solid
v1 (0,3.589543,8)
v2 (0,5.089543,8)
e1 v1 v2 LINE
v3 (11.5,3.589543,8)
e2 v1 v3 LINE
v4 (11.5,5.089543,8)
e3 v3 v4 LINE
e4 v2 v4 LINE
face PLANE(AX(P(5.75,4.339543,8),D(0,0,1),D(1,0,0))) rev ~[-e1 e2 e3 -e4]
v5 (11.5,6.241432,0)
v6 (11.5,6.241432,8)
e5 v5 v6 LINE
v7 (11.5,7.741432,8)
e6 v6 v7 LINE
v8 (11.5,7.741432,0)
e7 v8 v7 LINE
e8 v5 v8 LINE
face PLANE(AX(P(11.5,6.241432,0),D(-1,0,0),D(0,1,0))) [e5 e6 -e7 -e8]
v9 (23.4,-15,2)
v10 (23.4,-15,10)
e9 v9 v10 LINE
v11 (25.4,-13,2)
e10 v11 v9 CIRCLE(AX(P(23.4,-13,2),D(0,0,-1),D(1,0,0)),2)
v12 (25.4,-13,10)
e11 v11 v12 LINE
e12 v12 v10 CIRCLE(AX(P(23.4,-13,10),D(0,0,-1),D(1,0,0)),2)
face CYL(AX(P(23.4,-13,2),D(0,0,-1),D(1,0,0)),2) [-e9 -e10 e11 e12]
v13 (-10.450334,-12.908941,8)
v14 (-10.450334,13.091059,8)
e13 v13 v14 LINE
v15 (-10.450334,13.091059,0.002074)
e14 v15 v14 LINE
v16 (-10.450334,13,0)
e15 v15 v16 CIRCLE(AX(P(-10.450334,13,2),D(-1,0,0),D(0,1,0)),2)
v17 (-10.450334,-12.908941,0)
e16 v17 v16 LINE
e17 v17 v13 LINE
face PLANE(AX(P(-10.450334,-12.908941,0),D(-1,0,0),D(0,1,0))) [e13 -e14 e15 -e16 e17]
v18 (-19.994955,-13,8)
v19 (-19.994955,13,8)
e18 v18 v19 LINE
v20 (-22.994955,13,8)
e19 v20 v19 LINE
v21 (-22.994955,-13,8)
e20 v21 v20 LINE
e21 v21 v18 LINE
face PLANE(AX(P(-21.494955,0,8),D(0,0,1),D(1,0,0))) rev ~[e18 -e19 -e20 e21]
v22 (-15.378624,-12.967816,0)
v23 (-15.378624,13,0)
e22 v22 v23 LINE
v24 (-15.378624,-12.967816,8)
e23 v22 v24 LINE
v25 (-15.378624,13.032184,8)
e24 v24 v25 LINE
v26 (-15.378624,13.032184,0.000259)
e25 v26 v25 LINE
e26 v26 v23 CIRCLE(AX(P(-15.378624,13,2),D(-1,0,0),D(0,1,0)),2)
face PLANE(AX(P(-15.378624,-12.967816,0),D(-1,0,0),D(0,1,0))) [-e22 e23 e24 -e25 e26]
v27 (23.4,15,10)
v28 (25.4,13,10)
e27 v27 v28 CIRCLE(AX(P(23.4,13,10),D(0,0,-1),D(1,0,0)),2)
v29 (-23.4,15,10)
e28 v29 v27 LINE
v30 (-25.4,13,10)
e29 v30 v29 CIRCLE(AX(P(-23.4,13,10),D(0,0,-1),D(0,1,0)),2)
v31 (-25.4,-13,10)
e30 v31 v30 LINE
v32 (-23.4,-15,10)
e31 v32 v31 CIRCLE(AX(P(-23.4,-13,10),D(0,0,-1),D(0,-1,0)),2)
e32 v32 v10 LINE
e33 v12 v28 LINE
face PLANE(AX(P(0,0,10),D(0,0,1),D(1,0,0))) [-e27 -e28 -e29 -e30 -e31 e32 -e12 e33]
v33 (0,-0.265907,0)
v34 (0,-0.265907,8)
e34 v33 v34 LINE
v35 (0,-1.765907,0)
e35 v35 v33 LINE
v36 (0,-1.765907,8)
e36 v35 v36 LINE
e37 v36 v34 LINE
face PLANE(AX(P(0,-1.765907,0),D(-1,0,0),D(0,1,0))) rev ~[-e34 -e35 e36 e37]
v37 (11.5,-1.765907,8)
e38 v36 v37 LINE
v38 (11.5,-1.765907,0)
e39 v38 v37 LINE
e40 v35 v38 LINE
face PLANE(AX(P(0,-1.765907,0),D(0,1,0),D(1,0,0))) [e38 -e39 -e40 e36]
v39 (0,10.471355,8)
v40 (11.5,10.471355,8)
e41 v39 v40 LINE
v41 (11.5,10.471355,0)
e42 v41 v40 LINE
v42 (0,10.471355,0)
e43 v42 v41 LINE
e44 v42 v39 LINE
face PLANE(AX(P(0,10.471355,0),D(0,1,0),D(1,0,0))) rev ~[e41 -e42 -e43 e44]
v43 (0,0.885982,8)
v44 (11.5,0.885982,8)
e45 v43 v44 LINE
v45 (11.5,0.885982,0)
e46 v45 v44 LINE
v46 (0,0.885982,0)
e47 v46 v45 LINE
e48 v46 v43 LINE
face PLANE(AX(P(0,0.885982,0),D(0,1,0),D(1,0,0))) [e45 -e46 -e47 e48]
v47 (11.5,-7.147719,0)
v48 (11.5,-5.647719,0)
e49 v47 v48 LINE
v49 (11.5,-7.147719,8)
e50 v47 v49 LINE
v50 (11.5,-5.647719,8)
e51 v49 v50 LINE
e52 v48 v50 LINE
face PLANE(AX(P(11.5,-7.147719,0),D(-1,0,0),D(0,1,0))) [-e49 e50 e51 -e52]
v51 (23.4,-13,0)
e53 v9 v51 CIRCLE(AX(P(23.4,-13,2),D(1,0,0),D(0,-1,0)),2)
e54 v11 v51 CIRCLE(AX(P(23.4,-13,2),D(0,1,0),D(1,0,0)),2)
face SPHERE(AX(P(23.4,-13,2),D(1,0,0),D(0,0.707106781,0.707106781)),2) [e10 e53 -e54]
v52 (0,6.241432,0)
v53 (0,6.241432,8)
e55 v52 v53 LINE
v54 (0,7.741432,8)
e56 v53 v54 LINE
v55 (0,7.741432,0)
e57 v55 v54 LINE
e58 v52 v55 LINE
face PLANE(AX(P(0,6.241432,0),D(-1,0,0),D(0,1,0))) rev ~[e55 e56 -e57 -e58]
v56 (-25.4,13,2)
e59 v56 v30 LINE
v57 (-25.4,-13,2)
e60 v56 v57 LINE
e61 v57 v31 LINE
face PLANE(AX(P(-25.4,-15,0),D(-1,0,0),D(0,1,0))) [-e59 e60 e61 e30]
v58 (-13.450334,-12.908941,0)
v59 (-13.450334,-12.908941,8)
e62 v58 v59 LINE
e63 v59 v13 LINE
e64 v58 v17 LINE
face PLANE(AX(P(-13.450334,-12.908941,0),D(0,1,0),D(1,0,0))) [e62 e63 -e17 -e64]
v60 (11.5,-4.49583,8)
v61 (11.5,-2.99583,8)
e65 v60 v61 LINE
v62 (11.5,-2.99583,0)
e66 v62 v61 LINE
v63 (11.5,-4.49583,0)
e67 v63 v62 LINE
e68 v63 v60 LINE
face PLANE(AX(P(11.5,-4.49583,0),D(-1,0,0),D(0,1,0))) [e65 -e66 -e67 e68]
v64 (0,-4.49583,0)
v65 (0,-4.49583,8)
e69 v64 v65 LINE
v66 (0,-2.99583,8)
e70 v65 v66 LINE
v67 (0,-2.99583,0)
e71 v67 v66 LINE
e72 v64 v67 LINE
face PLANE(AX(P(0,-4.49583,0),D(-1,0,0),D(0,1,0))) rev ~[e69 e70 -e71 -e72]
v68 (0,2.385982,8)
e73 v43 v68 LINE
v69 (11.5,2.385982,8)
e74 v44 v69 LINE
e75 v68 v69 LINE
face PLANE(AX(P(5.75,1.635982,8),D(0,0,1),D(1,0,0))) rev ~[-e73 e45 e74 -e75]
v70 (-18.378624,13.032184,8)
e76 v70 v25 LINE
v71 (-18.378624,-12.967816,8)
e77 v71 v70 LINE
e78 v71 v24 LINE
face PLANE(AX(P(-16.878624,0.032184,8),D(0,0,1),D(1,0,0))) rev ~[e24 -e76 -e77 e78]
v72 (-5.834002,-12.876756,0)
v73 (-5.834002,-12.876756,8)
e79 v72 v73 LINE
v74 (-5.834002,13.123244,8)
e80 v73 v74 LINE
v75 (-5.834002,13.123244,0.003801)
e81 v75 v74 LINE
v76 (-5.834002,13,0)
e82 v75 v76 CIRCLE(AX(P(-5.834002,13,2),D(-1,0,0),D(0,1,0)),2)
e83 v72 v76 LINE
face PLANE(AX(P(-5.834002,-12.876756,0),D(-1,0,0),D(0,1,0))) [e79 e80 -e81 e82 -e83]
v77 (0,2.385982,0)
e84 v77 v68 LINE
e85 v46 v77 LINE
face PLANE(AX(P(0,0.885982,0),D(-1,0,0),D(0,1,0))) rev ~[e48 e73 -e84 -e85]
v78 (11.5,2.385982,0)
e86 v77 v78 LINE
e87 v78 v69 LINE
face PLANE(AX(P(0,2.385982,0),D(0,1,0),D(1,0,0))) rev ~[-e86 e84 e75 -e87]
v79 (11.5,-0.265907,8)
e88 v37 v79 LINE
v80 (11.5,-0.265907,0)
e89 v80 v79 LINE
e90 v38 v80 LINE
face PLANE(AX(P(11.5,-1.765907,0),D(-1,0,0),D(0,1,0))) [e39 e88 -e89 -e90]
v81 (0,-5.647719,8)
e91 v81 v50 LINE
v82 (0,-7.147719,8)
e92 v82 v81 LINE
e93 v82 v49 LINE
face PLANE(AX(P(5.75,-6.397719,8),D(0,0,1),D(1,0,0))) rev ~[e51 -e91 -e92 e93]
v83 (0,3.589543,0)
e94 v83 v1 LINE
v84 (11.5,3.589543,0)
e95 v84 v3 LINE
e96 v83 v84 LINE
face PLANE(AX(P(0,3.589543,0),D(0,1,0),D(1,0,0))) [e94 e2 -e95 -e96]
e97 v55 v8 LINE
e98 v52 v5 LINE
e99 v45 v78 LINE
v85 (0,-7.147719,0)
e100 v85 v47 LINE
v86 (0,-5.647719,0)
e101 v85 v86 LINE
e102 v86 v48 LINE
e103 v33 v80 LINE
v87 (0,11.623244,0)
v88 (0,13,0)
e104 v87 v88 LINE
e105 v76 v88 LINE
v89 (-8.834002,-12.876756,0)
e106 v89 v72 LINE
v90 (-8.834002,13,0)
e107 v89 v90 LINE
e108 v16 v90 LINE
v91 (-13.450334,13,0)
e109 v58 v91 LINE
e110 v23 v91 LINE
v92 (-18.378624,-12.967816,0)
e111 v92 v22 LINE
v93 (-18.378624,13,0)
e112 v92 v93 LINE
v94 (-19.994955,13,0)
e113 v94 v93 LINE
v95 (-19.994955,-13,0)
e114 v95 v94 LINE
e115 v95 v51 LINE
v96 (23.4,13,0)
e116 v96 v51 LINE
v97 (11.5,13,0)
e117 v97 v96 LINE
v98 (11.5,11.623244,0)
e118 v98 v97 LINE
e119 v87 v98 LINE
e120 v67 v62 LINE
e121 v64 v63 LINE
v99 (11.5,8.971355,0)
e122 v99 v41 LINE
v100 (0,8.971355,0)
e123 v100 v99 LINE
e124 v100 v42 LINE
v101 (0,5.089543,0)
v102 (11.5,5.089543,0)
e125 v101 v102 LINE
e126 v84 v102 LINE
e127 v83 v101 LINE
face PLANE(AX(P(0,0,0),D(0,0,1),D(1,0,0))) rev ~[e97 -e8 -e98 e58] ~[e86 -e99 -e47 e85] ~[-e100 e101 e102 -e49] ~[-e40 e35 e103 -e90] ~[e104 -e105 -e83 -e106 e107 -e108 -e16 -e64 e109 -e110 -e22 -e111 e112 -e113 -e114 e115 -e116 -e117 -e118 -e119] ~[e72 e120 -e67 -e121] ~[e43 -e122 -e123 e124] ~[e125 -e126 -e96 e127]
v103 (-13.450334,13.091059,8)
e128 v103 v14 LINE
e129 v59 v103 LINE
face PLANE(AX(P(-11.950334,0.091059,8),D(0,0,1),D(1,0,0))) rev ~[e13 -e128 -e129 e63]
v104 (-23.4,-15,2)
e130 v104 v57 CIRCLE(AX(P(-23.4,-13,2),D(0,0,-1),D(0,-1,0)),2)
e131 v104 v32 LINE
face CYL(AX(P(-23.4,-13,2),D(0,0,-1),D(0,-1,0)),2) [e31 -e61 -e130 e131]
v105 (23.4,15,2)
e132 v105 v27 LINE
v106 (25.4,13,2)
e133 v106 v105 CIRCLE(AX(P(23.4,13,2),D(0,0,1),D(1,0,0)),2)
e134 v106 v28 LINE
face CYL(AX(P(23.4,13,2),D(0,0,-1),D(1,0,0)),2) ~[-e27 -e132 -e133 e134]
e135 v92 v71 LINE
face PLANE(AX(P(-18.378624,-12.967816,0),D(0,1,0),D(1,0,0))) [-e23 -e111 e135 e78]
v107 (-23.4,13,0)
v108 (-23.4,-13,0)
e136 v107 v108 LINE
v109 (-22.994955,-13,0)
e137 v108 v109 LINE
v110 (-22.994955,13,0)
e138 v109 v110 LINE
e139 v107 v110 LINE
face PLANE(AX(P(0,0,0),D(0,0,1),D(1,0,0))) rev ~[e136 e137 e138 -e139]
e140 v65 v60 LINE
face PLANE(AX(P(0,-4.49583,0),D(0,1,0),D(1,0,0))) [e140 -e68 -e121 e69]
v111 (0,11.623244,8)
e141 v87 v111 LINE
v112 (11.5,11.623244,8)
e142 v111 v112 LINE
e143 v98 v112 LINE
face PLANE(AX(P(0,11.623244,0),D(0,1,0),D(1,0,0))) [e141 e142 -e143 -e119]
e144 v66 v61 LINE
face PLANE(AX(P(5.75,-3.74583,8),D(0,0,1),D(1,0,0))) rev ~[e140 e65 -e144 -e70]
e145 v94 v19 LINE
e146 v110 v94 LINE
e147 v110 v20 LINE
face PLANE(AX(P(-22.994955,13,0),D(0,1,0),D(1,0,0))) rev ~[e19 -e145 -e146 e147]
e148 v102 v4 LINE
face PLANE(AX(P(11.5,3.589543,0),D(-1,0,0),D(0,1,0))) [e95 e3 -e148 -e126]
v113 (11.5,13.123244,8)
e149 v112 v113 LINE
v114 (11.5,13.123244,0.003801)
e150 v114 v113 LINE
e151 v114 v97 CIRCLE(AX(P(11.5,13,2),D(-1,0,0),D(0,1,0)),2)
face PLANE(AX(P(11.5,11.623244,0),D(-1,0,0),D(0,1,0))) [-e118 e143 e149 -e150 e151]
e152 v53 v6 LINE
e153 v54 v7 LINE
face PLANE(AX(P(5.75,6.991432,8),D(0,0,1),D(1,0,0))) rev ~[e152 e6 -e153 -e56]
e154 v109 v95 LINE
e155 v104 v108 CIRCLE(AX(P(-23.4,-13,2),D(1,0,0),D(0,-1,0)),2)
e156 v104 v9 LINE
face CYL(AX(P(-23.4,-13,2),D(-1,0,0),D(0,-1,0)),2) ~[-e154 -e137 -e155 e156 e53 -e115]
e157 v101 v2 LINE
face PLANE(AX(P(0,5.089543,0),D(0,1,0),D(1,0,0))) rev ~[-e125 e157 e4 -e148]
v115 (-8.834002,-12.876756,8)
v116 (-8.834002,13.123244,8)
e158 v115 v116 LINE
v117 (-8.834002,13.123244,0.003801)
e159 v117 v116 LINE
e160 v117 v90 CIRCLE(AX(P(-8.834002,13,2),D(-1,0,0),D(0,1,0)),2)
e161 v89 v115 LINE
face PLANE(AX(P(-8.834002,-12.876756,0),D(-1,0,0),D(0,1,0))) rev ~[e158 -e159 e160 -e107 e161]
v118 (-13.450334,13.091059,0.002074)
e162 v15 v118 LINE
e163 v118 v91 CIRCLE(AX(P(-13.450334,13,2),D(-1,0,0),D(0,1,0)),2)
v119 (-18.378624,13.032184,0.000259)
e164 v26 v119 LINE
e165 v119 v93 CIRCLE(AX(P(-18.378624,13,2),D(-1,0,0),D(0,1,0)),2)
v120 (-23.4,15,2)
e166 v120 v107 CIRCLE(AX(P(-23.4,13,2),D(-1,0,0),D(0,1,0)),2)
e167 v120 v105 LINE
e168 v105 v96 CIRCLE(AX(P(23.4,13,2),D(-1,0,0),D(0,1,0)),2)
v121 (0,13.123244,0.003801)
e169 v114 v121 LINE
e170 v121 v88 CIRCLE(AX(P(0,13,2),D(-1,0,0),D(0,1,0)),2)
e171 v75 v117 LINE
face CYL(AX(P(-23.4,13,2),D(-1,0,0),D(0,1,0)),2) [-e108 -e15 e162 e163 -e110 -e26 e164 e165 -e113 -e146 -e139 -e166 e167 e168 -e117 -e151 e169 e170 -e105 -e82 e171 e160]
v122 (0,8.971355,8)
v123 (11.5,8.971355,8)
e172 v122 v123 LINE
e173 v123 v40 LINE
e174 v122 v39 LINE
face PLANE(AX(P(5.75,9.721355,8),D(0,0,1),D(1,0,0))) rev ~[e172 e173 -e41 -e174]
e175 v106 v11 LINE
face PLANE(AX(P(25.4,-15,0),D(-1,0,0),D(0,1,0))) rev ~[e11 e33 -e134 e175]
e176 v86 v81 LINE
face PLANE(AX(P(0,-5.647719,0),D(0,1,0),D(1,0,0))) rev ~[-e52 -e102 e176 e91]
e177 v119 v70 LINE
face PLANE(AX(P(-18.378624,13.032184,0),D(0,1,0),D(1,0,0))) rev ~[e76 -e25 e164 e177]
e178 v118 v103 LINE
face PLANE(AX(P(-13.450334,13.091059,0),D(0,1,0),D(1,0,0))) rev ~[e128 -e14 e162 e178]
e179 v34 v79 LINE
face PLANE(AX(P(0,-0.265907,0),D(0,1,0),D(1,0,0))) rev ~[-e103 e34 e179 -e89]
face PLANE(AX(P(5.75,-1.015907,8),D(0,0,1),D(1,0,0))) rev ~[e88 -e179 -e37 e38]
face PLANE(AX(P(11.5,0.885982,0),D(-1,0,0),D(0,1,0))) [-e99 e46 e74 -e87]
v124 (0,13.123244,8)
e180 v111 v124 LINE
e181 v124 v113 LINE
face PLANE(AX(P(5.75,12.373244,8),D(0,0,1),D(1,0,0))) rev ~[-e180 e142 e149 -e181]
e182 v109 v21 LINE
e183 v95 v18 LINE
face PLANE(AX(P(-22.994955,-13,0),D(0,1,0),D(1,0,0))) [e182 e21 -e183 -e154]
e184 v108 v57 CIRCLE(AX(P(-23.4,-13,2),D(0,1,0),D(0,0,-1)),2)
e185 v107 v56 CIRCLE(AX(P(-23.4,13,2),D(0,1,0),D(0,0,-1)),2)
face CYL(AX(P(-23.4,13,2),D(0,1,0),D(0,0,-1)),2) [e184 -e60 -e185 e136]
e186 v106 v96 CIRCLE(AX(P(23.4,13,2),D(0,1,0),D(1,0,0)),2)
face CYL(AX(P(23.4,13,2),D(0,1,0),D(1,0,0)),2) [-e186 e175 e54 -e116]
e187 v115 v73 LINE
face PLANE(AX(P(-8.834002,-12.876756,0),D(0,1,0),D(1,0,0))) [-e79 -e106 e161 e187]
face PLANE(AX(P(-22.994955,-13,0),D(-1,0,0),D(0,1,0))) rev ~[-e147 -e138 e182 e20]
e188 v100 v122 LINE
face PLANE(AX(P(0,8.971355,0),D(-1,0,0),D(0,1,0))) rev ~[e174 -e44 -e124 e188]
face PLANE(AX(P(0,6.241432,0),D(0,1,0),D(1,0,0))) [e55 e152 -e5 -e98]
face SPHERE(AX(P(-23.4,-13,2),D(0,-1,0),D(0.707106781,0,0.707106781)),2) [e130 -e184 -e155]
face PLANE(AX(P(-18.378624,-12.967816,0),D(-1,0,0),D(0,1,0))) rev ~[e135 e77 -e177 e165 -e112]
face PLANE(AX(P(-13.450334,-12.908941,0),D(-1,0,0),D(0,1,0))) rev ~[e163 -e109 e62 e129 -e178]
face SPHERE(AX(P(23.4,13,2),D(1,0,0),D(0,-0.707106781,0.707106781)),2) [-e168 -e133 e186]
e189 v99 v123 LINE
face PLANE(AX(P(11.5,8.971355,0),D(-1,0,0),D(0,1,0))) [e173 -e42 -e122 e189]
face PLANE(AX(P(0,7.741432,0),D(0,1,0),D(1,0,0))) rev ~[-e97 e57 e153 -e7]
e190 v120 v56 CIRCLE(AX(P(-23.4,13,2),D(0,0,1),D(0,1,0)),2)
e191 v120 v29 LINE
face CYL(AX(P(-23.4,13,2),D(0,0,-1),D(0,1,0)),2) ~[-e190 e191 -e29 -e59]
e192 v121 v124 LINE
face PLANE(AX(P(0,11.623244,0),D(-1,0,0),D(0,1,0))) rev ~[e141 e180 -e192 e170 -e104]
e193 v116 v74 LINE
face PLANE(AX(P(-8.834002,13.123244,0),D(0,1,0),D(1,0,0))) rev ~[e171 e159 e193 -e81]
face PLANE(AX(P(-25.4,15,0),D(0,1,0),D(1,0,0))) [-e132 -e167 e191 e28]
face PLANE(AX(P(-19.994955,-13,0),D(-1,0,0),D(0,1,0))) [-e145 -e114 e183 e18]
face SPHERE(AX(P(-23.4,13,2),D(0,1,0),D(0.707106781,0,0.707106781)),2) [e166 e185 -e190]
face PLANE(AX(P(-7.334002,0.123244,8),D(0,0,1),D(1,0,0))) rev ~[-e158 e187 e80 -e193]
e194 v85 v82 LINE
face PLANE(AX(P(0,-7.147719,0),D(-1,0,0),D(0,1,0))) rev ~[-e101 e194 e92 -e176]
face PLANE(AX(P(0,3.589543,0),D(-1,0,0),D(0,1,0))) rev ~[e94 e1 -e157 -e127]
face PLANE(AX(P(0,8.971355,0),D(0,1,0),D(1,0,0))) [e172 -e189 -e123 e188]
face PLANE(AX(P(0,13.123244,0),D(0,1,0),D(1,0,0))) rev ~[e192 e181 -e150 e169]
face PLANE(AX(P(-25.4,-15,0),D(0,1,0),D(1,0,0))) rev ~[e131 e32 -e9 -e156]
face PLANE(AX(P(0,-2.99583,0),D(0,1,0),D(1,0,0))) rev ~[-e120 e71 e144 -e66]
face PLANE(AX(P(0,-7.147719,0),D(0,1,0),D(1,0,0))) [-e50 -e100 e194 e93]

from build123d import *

# Parameters (mm, degrees)
F0_W         = 50.8
F0_H         = 30
F1_DEPTH     = 10
F2_W         = 3
F2_H         = 26
F2_W_2       = 11.5
F2_H_2       = 1.5
F3_DEPTH     = 8
F4_T1_DEPTH  = 13
F4_T3_DEPTH  = 26
F4_T5_DEPTH  = 46.8
F4_S9_W      = 2
F4_S9_H      = 2
F4_T10_DEPTH = 2
F4_S15_W     = 2
F4_S15_H     = 2
F4_T16_DEPTH = 2
F4_S21_W     = 2
F4_S21_H     = 2
F4_T22_DEPTH = 2
F4_S27_W     = 2
F4_S27_H     = 2
F4_T28_DEPTH = 2


# Not quite as in the source:
# - a fillet or chamfer that OpenCascade refuses, or shapes differently, is made with other operations: its cross-section is extruded or revolved along the edge and cut away or added


with BuildPart() as f1:
    # F0 (on Top) → F1 (new body)
    with BuildSketch(Plane.XY):
        Rectangle(F0_W, F0_H)
    extrude(amount=F1_DEPTH)

    # F2 (on Top) → F3 (cut)
    with BuildSketch(Plane.XY):
        with Locations((-7.3340023962, 0.1232437862)):
            Rectangle(F2_W, F2_H)
        with Locations((-11.9503338486, 0.091059359)):
            Rectangle(F2_W, F2_H)
        with Locations((-16.8786235154, 0.0321844273)):
            Rectangle(F2_W, F2_H)
        with Locations((-21.4949549678, 0)):
            Rectangle(F2_W, F2_H)
        with Locations((5.75, 4.3395428155)):
            Rectangle(F2_W_2, F2_H_2)
        with Locations((5.75, 6.9914316775)):
            Rectangle(F2_W_2, F2_H_2)
        with Locations((5.75, 9.7213549241)):
            Rectangle(F2_W_2, F2_H_2)
        with Locations((5.75, 12.3732437862)):
            Rectangle(F2_W_2, F2_H_2)
        with Locations((5.75, 1.6359822841)):
            Rectangle(F2_W_2, F2_H_2)
        with Locations((5.75, -1.0159065779)):
            Rectangle(F2_W_2, F2_H_2)
        with Locations((5.75, -3.7458298245)):
            Rectangle(F2_W_2, F2_H_2)
        with Locations((5.75, -6.3977186866)):
            Rectangle(F2_W_2, F2_H_2)
    extrude(amount=F3_DEPTH, mode=Mode.SUBTRACT)

    # F4: fillet of radius 2 on 8 edges, made by hand

    # F4_s2 → F4_t1 (cut)
    with BuildSketch(Plane.XY.offset(2)):
        with BuildLine():
            ThreePointArc((25.4, 13), (24.8142135624, 14.4142135624), (23.4, 15))
            Line((23.4, 15), (25.4, 15))
            Line((25.4, 15), (25.4, 13))
        make_face()
        with BuildLine():
            ThreePointArc((25.4, -13), (24.8142135624, -14.4142135624), (23.4, -15))
            Line((23.4, -15), (25.4, -15))
            Line((25.4, -15), (25.4, -13))
        make_face()
        with BuildLine():
            ThreePointArc((-23.4, -15), (-24.8142135624, -14.4142135624), (-25.4, -13))
            Line((-25.4, -13), (-25.4, -15))
            Line((-25.4, -15), (-23.4, -15))
        make_face()
        with BuildLine():
            ThreePointArc((-23.4, 15), (-24.8142135624, 14.4142135624), (-25.4, 13))
            Line((-25.4, 13), (-25.4, 15))
            Line((-25.4, 15), (-23.4, 15))
        make_face()
    extrude(amount=F4_T1_DEPTH, mode=Mode.SUBTRACT)

    # F4_s4 → F4_t3 (cut)
    with BuildSketch(Plane.XZ.offset(-13)):
        with BuildLine():
            ThreePointArc((25.4, 2), (24.8142135624, 0.5857864376), (23.4, 0))
            Line((23.4, 0), (25.4, 0))
            Line((25.4, 0), (25.4, 2))
        make_face()
        with BuildLine():
            ThreePointArc((-23.4, 0), (-24.8142135624, 0.5857864376), (-25.4, 2))
            Line((-25.4, 2), (-25.4, 0))
            Line((-25.4, 0), (-23.4, 0))
        make_face()
    extrude(amount=F4_T3_DEPTH, mode=Mode.SUBTRACT)

    # F4_s6 → F4_t5 (cut)
    with BuildSketch(Plane.YZ.offset(-23.4)):
        with BuildLine():
            ThreePointArc((-15, 2), (-14.4142135624, 0.5857864376), (-13, 0))
            Line((-13, 0), (-15, 0))
            Line((-15, 0), (-15, 2))
        make_face()
        with BuildLine():
            ThreePointArc((15, 2), (14.4142135624, 0.5857864376), (13, 0))
            Line((13, 0), (15, 0))
            Line((15, 0), (15, 2))
        make_face()
    extrude(amount=F4_T5_DEPTH, mode=Mode.SUBTRACT)


with BuildPart() as f4_tool8:
    # F4_s9 → F4_t10 (new body)
    with BuildSketch(Plane.YZ.offset(23.4)):
        with Locations((14, 1)):
            Rectangle(F4_S9_W, F4_S9_H)
    extrude(amount=F4_T10_DEPTH)

    # F4_s11 → F4_t12 (revolve, cut)
    with BuildSketch(Plane(origin=(23.4, 13, 2), x_dir=(0, -0.7071067812, 0.7071067812), z_dir=(0, 0.7071067812, 0.7071067812))):
        with BuildLine():
            ThreePointArc((0, -2), (2, 0), (0, 2))
            Line((0, 2), (0, -2))
        make_face()
    revolve(axis=Axis((23.4, 13, 2), (1, 0, 0)), mode=Mode.SUBTRACT)


with BuildPart() as f1_1:
    add(f1.part)

    # F4_t7: cut F4_tool8
    add(f4_tool8.part, mode=Mode.SUBTRACT)


with BuildPart() as f4_tool14:
    # F4_s15 → F4_t16 (new body)
    with BuildSketch(Plane.YZ.offset(23.4)):
        with Locations((-14, 1)):
            Rectangle(F4_S15_W, F4_S15_H)
    extrude(amount=F4_T16_DEPTH)

    # F4_s17 → F4_t18 (revolve, cut)
    with BuildSketch(Plane(origin=(23.4, -13, 2), x_dir=(0, 0.7071067812, 0.7071067812), z_dir=(0, 0.7071067812, -0.7071067812))):
        with BuildLine():
            ThreePointArc((0, -2), (2, 0), (0, 2))
            Line((0, 2), (0, -2))
        make_face()
    revolve(axis=Axis((23.4, -13, 2), (1, 0, 0)), mode=Mode.SUBTRACT)


with BuildPart() as f1_2:
    add(f1_1.part)

    # F4_t13: cut F4_tool14
    add(f4_tool14.part, mode=Mode.SUBTRACT)


with BuildPart() as f4_tool20:
    # F4_s21 → F4_t22 (new body)
    with BuildSketch(Plane.XZ.offset(13)):
        with Locations((-24.4, 1)):
            Rectangle(F4_S21_W, F4_S21_H)
    extrude(amount=F4_T22_DEPTH)

    # F4_s23 → F4_t24 (revolve, cut)
    with BuildSketch(Plane(origin=(-23.4, -13, 2), x_dir=(0.7071067812, 0, 0.7071067812), z_dir=(0.7071067812, 0, -0.7071067812))):
        with BuildLine():
            ThreePointArc((0, -2), (2, 0), (0, 2))
            Line((0, 2), (0, -2))
        make_face()
    revolve(axis=Axis((-23.4, -13, 2), (0, -1, 0)), mode=Mode.SUBTRACT)


with BuildPart() as f1_3:
    add(f1_2.part)

    # F4_t19: cut F4_tool20
    add(f4_tool20.part, mode=Mode.SUBTRACT)


with BuildPart() as f4_tool26:
    # F4_s27 → F4_t28 (new body)
    with BuildSketch(Plane.XZ.offset(-13)):
        with Locations((-24.4, 1)):
            Rectangle(F4_S27_W, F4_S27_H)
    extrude(amount=-F4_T28_DEPTH)

    # F4_s29 → F4_t30 (revolve, cut)
    with BuildSketch(Plane(origin=(-23.4, 13, 2), x_dir=(0.7071067812, 0, 0.7071067812), z_dir=(-0.7071067812, 0, 0.7071067812))):
        with BuildLine():
            ThreePointArc((0, -2), (2, 0), (0, 2))
            Line((0, 2), (0, -2))
        make_face()
    revolve(axis=Axis((-23.4, 13, 2), (0, 1, 0)), mode=Mode.SUBTRACT)


with BuildPart() as f1_4:
    add(f1_3.part)

    # F4_t25: cut F4_tool26
    add(f4_tool26.part, mode=Mode.SUBTRACT)


solid = f1_4.part
